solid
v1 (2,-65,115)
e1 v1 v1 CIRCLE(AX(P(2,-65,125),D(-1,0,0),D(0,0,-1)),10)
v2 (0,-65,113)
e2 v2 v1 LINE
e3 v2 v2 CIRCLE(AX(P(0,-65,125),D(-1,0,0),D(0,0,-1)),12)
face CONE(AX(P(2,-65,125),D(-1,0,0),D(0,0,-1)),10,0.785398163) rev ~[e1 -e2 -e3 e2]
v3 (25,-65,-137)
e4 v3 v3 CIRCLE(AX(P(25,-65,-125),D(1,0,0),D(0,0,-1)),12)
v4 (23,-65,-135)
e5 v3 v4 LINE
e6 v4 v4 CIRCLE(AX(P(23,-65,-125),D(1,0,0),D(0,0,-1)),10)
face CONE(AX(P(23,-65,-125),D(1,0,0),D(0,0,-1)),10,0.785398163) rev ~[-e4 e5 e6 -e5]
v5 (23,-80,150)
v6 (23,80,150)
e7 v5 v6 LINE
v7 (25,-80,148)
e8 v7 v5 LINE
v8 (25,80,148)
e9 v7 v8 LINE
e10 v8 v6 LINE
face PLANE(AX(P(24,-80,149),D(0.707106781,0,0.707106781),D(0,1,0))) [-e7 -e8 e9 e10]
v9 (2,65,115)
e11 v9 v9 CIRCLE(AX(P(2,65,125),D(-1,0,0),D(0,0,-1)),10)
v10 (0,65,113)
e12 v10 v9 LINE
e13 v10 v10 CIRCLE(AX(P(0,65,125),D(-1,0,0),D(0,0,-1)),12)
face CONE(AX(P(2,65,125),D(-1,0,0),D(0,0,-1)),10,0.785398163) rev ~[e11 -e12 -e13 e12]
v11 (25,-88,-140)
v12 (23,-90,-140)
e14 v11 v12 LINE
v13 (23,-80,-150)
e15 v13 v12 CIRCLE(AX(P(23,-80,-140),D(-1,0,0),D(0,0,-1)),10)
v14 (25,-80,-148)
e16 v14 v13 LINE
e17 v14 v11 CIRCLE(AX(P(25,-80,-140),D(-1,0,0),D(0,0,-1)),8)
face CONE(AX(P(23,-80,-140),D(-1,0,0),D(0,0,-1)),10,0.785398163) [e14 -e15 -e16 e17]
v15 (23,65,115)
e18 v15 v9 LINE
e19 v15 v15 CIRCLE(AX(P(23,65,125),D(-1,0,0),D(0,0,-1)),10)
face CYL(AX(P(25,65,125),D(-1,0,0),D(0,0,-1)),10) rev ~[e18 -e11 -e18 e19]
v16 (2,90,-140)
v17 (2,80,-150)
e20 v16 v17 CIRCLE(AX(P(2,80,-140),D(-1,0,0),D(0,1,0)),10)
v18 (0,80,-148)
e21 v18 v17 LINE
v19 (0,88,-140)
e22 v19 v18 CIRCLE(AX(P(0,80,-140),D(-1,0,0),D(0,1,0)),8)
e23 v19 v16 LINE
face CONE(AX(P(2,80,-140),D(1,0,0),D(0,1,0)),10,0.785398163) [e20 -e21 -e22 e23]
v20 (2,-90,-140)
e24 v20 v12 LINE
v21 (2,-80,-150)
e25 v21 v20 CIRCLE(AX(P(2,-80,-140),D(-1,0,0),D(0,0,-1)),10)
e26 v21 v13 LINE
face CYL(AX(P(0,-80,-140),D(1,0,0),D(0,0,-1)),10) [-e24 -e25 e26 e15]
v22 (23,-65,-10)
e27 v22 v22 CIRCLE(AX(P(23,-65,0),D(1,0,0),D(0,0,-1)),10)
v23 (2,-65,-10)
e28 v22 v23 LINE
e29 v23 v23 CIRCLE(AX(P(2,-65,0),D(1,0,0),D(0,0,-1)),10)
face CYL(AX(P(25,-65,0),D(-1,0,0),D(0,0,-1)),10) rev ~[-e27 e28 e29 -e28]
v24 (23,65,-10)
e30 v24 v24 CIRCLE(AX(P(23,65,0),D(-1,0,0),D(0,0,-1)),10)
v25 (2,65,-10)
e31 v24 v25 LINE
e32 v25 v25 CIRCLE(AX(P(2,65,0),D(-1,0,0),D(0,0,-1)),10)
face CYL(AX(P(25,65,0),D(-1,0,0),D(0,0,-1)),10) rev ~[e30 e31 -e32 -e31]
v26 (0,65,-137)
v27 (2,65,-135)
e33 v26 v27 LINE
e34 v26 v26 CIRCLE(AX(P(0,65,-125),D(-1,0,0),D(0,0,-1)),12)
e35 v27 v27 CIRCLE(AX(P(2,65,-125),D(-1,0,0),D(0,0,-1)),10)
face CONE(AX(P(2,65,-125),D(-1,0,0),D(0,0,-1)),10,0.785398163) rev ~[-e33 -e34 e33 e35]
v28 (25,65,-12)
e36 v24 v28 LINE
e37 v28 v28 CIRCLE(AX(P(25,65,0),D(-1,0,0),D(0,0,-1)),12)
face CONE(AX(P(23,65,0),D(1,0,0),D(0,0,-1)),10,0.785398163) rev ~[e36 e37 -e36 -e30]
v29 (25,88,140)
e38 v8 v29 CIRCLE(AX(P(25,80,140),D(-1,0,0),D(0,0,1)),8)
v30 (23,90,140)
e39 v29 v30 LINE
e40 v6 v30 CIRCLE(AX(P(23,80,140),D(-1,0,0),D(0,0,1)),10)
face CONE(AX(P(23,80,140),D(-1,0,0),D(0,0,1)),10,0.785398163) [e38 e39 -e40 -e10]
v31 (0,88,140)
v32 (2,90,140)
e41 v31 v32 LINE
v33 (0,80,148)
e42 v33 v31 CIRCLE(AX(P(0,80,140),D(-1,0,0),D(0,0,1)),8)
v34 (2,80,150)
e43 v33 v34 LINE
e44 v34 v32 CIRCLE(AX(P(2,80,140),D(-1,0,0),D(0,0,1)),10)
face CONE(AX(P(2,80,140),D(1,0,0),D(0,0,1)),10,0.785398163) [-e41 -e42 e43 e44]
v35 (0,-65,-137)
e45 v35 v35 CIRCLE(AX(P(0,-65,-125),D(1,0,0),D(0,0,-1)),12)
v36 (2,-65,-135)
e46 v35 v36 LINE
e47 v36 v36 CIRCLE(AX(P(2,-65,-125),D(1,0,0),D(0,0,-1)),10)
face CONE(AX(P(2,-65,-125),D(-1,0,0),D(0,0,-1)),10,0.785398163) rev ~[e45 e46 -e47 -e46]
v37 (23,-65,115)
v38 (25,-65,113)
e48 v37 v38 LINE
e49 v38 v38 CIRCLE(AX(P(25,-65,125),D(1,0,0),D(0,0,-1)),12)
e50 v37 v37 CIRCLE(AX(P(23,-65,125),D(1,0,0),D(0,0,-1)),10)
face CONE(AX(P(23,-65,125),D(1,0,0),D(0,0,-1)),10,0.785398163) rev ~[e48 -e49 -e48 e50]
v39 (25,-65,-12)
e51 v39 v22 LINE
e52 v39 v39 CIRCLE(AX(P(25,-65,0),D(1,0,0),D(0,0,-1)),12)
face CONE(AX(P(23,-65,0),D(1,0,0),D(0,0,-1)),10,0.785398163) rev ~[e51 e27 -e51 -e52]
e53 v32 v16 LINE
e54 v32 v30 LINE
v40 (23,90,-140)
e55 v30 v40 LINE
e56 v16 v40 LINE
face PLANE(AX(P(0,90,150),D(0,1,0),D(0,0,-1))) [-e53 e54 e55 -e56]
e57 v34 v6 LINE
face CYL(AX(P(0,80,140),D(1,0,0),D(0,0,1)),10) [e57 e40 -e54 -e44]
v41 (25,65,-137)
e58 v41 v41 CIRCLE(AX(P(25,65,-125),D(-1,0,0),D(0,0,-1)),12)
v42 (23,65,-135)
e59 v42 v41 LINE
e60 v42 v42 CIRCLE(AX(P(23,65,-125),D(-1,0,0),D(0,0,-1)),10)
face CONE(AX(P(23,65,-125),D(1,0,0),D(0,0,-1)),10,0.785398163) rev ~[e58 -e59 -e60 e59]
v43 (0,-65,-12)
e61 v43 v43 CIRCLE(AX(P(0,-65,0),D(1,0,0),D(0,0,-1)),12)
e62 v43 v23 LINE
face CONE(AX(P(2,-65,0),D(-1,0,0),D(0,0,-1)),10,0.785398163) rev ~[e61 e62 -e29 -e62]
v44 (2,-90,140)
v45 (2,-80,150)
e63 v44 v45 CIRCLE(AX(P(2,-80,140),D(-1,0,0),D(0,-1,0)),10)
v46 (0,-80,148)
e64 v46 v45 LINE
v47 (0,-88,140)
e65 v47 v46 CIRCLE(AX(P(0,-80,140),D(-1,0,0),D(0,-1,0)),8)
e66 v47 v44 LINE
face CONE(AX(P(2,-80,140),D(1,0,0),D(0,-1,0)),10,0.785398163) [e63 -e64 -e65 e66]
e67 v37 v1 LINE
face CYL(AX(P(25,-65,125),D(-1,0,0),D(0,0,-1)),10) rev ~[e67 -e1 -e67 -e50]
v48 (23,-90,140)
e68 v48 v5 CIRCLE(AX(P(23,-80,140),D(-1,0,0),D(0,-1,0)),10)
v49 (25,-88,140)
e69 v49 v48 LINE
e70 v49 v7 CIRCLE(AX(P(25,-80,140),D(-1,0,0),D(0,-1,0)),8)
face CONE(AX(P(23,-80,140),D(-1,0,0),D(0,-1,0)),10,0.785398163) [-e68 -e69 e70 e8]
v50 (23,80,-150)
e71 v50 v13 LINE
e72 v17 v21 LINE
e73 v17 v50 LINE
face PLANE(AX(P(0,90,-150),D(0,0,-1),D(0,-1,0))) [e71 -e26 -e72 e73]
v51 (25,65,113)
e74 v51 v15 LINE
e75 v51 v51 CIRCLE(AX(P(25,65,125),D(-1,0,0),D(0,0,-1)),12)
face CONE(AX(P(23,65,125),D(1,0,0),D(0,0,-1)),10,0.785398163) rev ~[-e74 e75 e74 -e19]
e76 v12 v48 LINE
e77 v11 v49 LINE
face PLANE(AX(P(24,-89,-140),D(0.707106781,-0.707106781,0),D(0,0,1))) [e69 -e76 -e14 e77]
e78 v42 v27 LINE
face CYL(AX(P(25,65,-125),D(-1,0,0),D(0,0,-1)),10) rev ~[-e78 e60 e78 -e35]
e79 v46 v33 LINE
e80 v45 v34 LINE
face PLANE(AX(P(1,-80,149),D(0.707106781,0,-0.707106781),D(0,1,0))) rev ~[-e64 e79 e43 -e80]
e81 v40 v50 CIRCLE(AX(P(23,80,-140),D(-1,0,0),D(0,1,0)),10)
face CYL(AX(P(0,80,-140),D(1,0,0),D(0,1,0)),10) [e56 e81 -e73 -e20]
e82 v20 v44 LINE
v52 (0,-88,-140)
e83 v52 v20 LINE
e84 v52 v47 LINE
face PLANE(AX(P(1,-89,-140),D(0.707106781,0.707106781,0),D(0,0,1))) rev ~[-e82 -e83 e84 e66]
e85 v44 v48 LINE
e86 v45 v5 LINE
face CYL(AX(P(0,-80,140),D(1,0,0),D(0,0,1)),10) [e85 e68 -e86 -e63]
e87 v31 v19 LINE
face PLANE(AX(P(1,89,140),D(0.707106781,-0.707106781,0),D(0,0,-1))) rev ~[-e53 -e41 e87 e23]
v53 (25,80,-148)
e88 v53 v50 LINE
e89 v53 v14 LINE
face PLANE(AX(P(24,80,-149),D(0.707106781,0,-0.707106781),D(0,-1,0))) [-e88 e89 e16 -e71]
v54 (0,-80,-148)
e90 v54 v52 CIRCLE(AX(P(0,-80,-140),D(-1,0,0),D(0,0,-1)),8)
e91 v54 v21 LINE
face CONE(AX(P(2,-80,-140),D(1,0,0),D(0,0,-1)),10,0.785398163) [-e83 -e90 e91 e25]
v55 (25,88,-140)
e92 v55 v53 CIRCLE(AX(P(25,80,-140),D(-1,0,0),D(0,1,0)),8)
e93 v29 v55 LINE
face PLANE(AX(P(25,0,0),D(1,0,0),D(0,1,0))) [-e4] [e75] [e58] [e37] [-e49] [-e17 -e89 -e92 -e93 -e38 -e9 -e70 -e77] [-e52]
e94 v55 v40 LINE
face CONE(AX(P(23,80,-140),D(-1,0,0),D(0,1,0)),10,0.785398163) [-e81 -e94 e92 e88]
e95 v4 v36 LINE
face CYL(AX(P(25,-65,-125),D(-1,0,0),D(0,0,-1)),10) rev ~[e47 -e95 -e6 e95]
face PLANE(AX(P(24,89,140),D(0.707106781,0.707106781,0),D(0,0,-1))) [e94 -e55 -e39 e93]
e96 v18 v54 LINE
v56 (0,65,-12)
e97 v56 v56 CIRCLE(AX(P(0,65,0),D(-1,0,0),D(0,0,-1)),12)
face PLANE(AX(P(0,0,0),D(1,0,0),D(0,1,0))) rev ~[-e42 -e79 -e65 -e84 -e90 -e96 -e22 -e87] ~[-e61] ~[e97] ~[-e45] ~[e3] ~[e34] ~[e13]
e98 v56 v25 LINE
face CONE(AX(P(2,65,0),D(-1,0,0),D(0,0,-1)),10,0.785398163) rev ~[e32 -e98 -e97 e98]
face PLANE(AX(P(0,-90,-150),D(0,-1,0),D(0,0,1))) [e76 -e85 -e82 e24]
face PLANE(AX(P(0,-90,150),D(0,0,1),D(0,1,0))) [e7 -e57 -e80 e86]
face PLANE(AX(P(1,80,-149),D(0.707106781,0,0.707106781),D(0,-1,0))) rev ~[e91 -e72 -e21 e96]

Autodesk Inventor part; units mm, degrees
ref_plane "YZ Plane" through (0, 0, 0) normal (1, 0, 0) x (0, 1, 0)
ref_plane "XZ Plane" through (0, 0, 0) normal (0, 1, 0) x (-1, 0, 0)
sketch "草圖1" plane through (0, 0, 0) normal (1, 0, 0) x (0, 1, 0)
  line L0 (-90, 150) -> (90, 150)
  line L1 (90, 150) -> (90, -150)
  line L2 (90, -150) -> (-90, -150)
  line L3 (-90, -150) -> (-90, 150)
  line L4 (-90, 150) -> (90, -150) construction
  line L5 (90, 150) -> (-90, -150) construction
  point P0 (0, 0)
  dimension "d0" = 180
  dimension "d1" = 300
extrude "擠出1" add sketch "草圖1" along normal blind 25
fillet "圓角1" radius 10 4 edges at (12.5, 90, 150) (12.5, -90, 150) (12.5, 90, -150) (12.5, -90, -150)
chamfer "倒角1" distance 2 angle 45 16 edges at (25, 90, 0) (25, 87.0711, 147.0711) (25, 0, 150) (25, -87.0711, 147.0711) (25, -90, 0) (25, -87.0711, -147.0711) (25, 0, -150) (25, 87.0711, -147.0711) (0, 90, 0) (0, 87.0711, -147.0711) (0, 0, -150) (0, -87.0711, -147.0711) (0, -90, 0) (0, -87.0711, 147.0711) (0, 0, 150) (0, 87.0711, 147.0711)
sketch "草圖2" plane through (25, 0, 0) normal (1, 0, 0) x (0, 0, -1)
  line L0 (-150, 80) -> (-150, -80) projected
  line L1 (0, -126) -> (0, 126) projected
  line L2 (210, 0) -> (-210, 0) projected
  line L3 (-125, -126) -> (-125, 126)
  line L4 (210, 65) -> (-210, 65)
  point P0 (0, 0)
  point P1 (-125, 65)
  dimension "d8" = 125
  dimension "d9" = 65
hole "孔1" at (25, 65, 125) direction (-1, 0, 0) diameter 20 end through all
chamfer "倒角2" distance 2 angle 45 2 edges at (25, 65, 135) (0, 65, 135)
pattern_linear "矩形陣列1" count 3 spacing 125 along (0, 0, -1) of "孔1", "倒角2"
ref_plane "工作平面1" through (2, 0, -140) normal (0, -1, 0) x (1, 0, 0)
mirror "鏡射1" about plane through (2, 0, -140) normal (0, -1, 0) of "孔1", "倒角2", "矩形陣列1"
properties part number "exercise3-16ipt"
